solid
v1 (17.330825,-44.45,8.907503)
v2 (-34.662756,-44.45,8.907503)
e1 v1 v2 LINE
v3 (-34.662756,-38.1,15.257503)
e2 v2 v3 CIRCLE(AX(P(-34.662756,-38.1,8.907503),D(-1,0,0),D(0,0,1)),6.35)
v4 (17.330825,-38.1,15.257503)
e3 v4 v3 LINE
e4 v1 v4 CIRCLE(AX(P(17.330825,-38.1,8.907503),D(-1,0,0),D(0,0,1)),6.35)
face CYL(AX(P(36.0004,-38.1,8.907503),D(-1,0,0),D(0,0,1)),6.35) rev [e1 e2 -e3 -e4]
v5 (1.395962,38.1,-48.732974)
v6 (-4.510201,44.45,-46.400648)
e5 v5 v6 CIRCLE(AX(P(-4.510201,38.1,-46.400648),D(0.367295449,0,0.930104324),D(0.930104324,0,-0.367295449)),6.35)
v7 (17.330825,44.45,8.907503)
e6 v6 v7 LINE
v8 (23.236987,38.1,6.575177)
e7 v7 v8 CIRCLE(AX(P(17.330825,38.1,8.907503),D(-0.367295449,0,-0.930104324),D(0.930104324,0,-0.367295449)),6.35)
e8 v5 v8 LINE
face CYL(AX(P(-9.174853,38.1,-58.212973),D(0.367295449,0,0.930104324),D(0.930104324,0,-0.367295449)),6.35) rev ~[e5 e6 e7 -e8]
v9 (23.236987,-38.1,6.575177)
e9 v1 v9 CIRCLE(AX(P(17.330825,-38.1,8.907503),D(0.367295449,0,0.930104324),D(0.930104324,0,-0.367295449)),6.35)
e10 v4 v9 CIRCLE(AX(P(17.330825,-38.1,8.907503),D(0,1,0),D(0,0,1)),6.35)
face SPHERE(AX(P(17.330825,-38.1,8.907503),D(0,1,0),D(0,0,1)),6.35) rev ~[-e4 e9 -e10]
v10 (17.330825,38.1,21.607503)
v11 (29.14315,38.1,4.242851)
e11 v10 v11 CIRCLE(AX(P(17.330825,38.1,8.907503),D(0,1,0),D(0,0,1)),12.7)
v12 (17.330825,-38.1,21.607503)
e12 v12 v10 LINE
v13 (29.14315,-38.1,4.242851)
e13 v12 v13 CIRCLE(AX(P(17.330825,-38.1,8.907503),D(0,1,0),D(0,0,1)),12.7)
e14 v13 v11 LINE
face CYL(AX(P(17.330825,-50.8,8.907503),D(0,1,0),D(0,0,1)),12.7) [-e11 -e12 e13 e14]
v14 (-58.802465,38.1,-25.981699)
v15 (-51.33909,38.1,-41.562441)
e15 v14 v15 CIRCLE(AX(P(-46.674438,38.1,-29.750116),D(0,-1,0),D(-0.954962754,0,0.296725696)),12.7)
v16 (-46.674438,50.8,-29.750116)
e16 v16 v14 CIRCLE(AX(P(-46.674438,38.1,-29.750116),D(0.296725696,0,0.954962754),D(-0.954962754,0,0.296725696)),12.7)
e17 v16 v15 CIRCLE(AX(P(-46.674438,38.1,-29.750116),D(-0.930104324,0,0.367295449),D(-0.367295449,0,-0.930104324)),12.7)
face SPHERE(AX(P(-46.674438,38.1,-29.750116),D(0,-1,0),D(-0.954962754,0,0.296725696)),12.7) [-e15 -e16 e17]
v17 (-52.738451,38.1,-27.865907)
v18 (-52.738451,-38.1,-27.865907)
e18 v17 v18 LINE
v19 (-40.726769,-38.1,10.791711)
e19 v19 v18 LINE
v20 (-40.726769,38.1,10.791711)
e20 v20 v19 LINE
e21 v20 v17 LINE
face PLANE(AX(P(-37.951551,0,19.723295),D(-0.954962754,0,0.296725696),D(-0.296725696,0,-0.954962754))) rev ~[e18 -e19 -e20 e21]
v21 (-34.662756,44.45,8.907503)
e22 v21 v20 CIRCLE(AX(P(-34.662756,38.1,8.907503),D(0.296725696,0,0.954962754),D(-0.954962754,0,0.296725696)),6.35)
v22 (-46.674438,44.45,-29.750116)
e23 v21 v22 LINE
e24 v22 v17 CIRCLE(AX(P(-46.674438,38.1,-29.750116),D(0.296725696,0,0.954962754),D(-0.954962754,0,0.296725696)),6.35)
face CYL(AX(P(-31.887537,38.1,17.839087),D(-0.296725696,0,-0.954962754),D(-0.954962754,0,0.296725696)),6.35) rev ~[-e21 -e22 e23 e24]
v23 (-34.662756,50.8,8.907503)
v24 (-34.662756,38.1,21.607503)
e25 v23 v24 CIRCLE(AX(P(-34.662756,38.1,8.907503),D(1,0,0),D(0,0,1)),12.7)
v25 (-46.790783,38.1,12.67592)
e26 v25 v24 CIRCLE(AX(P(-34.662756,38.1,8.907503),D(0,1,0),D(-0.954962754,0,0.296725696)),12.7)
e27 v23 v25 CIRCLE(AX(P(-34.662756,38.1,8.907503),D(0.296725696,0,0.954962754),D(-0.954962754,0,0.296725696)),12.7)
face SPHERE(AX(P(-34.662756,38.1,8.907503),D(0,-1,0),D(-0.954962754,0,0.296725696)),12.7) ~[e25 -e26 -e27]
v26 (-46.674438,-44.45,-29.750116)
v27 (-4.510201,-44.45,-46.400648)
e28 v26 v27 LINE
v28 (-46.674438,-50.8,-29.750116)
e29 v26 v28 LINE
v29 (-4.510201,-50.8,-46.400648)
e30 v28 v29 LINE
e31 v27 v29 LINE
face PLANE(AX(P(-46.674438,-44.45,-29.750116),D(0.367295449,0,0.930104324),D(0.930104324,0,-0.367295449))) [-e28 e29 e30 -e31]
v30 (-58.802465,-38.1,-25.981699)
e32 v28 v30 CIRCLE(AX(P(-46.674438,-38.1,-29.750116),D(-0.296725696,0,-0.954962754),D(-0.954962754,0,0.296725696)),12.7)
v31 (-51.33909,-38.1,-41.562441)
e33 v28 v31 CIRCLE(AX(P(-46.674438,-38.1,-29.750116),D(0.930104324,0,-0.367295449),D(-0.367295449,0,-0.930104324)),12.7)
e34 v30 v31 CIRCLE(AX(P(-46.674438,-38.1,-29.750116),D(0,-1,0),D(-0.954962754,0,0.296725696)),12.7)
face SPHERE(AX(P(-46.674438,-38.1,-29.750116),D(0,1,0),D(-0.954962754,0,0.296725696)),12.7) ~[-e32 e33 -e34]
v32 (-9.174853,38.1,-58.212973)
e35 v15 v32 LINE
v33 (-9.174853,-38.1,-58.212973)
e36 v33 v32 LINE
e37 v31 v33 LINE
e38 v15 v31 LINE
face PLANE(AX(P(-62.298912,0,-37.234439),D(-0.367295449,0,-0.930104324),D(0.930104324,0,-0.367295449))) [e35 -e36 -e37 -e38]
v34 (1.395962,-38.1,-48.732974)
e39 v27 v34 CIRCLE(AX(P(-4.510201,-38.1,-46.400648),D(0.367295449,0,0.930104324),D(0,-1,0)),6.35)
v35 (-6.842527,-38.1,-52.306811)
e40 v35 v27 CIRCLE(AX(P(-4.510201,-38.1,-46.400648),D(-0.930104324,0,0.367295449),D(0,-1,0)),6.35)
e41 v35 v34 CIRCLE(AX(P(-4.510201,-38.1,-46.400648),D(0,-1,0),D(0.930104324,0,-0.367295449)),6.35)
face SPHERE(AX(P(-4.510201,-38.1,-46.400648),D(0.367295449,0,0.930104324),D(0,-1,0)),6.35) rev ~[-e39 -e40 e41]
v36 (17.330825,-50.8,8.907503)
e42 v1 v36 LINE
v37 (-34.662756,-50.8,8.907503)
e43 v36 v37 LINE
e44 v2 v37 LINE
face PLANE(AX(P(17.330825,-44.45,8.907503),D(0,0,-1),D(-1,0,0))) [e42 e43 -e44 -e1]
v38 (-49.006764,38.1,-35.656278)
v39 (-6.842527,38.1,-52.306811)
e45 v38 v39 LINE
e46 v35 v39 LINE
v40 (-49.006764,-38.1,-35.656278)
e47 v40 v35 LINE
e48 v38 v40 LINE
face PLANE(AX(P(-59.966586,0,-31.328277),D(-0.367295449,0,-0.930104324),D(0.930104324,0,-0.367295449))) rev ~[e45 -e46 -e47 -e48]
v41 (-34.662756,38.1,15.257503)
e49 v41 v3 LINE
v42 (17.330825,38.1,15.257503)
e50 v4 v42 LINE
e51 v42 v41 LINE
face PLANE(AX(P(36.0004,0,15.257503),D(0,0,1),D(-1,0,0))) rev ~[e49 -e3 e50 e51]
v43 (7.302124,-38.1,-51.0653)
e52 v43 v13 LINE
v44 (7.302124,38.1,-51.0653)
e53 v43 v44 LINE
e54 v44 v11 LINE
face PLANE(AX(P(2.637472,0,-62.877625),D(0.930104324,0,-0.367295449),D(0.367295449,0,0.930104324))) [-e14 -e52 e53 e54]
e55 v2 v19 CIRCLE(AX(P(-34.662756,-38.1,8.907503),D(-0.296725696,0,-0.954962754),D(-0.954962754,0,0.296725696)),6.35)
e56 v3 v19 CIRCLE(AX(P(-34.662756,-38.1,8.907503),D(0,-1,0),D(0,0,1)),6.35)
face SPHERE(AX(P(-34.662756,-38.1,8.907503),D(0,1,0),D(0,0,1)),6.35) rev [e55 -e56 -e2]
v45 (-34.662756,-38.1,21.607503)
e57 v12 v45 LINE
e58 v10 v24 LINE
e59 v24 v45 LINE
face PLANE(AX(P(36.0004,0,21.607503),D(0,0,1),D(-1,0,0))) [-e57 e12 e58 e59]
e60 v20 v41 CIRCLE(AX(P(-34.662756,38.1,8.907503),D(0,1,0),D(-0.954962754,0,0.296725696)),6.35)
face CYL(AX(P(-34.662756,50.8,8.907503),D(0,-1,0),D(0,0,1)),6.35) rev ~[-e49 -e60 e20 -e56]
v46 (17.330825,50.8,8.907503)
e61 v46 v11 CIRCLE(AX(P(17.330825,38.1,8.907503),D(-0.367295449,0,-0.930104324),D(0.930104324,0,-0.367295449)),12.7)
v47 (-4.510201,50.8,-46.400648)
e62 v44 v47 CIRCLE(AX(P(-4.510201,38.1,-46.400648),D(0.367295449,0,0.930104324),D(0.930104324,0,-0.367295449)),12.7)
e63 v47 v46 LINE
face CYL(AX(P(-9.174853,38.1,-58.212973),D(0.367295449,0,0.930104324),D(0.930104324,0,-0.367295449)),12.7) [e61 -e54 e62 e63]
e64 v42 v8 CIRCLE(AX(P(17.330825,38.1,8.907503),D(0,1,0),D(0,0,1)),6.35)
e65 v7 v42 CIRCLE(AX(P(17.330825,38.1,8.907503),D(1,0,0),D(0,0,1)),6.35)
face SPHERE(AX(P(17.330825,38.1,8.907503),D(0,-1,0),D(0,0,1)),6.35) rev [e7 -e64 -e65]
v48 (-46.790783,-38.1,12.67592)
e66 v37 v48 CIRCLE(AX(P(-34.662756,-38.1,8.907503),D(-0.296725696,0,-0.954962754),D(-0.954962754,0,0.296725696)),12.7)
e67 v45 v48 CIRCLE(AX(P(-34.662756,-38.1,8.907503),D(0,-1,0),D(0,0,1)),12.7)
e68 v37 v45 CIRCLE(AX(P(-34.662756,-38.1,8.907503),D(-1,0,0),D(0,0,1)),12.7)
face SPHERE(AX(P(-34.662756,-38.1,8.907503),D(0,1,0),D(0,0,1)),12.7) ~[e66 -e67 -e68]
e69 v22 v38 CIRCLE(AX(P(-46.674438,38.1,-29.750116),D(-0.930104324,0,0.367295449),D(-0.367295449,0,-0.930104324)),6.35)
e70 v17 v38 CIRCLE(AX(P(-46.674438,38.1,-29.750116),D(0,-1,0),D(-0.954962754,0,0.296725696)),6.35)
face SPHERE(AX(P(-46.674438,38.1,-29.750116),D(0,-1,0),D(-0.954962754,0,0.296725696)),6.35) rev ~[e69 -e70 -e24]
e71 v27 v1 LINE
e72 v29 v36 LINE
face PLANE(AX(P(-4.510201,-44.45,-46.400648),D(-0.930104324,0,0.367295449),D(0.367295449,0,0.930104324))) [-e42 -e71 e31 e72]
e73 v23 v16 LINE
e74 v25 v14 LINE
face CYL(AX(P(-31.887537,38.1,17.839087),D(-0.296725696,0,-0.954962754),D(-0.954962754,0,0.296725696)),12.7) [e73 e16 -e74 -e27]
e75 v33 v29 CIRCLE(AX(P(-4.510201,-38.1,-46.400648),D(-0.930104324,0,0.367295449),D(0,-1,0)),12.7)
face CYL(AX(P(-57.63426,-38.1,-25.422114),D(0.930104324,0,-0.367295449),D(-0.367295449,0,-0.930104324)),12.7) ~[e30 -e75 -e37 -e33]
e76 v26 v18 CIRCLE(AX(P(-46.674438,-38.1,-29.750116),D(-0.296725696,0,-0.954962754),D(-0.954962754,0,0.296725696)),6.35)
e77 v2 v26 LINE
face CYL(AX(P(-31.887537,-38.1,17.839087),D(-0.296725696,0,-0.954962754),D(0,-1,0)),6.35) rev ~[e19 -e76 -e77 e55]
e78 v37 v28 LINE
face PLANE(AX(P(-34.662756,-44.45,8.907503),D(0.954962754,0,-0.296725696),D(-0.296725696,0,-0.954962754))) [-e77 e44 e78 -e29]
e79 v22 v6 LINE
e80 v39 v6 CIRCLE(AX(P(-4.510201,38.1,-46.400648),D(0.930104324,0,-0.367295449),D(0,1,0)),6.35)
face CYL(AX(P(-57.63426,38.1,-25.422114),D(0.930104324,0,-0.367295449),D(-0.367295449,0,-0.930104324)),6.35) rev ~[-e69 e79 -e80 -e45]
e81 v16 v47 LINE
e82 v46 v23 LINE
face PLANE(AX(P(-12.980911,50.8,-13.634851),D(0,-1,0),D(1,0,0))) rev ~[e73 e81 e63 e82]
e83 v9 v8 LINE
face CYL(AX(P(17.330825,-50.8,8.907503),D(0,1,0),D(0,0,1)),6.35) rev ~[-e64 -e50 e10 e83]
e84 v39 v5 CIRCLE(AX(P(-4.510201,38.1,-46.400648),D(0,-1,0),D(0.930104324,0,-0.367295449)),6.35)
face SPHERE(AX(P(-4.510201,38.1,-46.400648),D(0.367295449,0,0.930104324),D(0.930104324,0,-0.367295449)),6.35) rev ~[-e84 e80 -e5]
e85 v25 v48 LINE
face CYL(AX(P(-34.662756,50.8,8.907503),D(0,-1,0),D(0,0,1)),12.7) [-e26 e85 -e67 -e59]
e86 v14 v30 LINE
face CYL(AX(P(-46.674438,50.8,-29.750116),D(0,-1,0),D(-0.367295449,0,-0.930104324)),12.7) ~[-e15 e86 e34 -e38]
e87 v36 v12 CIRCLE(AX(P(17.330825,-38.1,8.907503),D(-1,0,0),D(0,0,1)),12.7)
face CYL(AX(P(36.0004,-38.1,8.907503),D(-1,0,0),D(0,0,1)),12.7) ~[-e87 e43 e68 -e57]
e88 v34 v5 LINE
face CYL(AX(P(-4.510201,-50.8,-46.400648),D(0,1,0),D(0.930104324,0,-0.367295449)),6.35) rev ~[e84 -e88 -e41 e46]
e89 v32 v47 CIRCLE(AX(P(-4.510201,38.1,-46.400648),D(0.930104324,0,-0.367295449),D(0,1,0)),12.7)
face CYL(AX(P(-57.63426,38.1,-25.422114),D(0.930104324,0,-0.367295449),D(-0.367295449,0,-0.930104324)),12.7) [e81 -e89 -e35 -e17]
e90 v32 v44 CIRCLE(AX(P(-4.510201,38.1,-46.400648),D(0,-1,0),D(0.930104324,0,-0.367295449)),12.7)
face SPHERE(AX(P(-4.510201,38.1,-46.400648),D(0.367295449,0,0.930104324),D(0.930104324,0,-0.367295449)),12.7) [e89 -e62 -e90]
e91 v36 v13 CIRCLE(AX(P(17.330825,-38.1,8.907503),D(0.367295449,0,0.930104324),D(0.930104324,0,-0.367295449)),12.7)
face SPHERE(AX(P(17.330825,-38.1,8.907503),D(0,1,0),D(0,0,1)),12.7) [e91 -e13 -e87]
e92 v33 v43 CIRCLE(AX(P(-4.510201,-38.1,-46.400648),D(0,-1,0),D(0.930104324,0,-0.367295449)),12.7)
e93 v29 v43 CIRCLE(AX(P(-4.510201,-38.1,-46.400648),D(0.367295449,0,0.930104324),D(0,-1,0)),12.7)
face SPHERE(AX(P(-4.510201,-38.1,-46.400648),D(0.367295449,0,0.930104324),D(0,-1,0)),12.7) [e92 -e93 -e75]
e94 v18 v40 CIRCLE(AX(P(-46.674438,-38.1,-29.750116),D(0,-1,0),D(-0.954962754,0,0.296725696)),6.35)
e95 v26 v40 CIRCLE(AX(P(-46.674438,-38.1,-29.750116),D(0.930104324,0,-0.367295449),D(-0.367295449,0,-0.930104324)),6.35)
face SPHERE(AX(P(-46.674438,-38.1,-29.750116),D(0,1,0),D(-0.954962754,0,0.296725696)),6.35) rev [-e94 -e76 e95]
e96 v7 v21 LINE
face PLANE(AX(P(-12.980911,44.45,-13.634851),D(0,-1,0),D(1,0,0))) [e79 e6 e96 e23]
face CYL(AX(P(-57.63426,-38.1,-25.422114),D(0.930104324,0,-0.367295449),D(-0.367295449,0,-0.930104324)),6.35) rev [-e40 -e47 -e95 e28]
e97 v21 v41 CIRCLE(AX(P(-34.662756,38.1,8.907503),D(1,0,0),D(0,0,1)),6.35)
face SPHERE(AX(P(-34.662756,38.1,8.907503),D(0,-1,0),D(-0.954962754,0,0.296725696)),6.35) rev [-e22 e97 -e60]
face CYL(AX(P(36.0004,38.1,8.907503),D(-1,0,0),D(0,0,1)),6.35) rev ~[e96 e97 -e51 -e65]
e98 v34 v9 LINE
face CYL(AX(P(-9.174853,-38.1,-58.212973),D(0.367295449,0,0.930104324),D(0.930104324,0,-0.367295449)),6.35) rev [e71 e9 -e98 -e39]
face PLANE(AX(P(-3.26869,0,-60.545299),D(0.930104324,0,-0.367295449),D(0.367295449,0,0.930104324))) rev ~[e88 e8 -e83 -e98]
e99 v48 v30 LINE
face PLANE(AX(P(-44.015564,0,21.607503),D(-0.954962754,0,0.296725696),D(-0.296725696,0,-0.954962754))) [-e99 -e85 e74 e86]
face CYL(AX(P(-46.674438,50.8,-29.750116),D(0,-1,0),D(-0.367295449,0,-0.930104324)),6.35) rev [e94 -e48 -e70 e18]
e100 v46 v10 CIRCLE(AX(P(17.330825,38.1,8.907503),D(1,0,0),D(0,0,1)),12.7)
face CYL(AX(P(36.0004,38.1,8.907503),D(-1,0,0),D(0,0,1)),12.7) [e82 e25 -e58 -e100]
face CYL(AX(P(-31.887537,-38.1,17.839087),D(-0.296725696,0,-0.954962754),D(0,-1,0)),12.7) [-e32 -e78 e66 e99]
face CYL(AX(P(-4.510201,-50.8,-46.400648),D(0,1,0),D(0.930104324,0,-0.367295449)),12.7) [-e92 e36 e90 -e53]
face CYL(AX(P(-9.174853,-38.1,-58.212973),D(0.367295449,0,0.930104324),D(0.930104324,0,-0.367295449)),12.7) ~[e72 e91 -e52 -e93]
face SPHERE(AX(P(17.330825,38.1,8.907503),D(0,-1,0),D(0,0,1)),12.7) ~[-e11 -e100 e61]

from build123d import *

# Parameters (mm, degrees)
F1_DEPTH = 50.8
F2_R     = 12.7
F3_T     = -6.35


# Not quite as in the source:
# - a shell that OpenCascade refuses in one call is made with other operations: the cavity is built on its own and cut out


with BuildPart() as f1:
    # F0 (on Front) → F1 (new body, symmetric)
    with BuildSketch(Plane.XZ):
        Polygon((36.0003995515, 21.6075032949), (-44.0155640244, 21.6075032949), (-62.2989119761, -37.2344391203), (2.6374720037, -62.877625227), align=None)
    extrude(amount=F1_DEPTH, both=True)

    # F2
    f2_edges = [f1.edges().sort_by_distance(p)[0] for p in [
        (36.0004, 0, 21.607503),
        (-4.007582, 50.8, 21.607503),
        (-44.015564, 0, 21.607503),
        (-4.007582, -50.8, 21.607503),
        (19.318936, -50.8, -20.635061),
        (-53.157238, -50.8, -7.813468),
        (-29.83072, -50.8, -50.056032),
        (19.318936, 50.8, -20.635061),
        (2.637472, 0, -62.877625),
        (-53.157238, 50.8, -7.813468),
        (-29.83072, 50.8, -50.056032),
        (-62.298912, 0, -37.234439),
    ]]
    fillet(f2_edges, radius=F2_R)

    # F3: a shell. OpenCascade refuses it in one call, so the cavity is built on its own and cut out:
    # the body offset inwards by the wall thickness, plus a prism from it out through each open face.
    f3_core = offset(f1.part, amount=F3_T, mode=Mode.PRIVATE)
    f3_exits = [f3_core.faces().sort_by_distance(p)[0] for p in [
        (-15.577686, -44.45, -14.539718),
    ]]
    add(f3_core, mode=Mode.SUBTRACT)
    extrude(f3_exits, amount=-F3_T, mode=Mode.SUBTRACT)


solid = f1.part
